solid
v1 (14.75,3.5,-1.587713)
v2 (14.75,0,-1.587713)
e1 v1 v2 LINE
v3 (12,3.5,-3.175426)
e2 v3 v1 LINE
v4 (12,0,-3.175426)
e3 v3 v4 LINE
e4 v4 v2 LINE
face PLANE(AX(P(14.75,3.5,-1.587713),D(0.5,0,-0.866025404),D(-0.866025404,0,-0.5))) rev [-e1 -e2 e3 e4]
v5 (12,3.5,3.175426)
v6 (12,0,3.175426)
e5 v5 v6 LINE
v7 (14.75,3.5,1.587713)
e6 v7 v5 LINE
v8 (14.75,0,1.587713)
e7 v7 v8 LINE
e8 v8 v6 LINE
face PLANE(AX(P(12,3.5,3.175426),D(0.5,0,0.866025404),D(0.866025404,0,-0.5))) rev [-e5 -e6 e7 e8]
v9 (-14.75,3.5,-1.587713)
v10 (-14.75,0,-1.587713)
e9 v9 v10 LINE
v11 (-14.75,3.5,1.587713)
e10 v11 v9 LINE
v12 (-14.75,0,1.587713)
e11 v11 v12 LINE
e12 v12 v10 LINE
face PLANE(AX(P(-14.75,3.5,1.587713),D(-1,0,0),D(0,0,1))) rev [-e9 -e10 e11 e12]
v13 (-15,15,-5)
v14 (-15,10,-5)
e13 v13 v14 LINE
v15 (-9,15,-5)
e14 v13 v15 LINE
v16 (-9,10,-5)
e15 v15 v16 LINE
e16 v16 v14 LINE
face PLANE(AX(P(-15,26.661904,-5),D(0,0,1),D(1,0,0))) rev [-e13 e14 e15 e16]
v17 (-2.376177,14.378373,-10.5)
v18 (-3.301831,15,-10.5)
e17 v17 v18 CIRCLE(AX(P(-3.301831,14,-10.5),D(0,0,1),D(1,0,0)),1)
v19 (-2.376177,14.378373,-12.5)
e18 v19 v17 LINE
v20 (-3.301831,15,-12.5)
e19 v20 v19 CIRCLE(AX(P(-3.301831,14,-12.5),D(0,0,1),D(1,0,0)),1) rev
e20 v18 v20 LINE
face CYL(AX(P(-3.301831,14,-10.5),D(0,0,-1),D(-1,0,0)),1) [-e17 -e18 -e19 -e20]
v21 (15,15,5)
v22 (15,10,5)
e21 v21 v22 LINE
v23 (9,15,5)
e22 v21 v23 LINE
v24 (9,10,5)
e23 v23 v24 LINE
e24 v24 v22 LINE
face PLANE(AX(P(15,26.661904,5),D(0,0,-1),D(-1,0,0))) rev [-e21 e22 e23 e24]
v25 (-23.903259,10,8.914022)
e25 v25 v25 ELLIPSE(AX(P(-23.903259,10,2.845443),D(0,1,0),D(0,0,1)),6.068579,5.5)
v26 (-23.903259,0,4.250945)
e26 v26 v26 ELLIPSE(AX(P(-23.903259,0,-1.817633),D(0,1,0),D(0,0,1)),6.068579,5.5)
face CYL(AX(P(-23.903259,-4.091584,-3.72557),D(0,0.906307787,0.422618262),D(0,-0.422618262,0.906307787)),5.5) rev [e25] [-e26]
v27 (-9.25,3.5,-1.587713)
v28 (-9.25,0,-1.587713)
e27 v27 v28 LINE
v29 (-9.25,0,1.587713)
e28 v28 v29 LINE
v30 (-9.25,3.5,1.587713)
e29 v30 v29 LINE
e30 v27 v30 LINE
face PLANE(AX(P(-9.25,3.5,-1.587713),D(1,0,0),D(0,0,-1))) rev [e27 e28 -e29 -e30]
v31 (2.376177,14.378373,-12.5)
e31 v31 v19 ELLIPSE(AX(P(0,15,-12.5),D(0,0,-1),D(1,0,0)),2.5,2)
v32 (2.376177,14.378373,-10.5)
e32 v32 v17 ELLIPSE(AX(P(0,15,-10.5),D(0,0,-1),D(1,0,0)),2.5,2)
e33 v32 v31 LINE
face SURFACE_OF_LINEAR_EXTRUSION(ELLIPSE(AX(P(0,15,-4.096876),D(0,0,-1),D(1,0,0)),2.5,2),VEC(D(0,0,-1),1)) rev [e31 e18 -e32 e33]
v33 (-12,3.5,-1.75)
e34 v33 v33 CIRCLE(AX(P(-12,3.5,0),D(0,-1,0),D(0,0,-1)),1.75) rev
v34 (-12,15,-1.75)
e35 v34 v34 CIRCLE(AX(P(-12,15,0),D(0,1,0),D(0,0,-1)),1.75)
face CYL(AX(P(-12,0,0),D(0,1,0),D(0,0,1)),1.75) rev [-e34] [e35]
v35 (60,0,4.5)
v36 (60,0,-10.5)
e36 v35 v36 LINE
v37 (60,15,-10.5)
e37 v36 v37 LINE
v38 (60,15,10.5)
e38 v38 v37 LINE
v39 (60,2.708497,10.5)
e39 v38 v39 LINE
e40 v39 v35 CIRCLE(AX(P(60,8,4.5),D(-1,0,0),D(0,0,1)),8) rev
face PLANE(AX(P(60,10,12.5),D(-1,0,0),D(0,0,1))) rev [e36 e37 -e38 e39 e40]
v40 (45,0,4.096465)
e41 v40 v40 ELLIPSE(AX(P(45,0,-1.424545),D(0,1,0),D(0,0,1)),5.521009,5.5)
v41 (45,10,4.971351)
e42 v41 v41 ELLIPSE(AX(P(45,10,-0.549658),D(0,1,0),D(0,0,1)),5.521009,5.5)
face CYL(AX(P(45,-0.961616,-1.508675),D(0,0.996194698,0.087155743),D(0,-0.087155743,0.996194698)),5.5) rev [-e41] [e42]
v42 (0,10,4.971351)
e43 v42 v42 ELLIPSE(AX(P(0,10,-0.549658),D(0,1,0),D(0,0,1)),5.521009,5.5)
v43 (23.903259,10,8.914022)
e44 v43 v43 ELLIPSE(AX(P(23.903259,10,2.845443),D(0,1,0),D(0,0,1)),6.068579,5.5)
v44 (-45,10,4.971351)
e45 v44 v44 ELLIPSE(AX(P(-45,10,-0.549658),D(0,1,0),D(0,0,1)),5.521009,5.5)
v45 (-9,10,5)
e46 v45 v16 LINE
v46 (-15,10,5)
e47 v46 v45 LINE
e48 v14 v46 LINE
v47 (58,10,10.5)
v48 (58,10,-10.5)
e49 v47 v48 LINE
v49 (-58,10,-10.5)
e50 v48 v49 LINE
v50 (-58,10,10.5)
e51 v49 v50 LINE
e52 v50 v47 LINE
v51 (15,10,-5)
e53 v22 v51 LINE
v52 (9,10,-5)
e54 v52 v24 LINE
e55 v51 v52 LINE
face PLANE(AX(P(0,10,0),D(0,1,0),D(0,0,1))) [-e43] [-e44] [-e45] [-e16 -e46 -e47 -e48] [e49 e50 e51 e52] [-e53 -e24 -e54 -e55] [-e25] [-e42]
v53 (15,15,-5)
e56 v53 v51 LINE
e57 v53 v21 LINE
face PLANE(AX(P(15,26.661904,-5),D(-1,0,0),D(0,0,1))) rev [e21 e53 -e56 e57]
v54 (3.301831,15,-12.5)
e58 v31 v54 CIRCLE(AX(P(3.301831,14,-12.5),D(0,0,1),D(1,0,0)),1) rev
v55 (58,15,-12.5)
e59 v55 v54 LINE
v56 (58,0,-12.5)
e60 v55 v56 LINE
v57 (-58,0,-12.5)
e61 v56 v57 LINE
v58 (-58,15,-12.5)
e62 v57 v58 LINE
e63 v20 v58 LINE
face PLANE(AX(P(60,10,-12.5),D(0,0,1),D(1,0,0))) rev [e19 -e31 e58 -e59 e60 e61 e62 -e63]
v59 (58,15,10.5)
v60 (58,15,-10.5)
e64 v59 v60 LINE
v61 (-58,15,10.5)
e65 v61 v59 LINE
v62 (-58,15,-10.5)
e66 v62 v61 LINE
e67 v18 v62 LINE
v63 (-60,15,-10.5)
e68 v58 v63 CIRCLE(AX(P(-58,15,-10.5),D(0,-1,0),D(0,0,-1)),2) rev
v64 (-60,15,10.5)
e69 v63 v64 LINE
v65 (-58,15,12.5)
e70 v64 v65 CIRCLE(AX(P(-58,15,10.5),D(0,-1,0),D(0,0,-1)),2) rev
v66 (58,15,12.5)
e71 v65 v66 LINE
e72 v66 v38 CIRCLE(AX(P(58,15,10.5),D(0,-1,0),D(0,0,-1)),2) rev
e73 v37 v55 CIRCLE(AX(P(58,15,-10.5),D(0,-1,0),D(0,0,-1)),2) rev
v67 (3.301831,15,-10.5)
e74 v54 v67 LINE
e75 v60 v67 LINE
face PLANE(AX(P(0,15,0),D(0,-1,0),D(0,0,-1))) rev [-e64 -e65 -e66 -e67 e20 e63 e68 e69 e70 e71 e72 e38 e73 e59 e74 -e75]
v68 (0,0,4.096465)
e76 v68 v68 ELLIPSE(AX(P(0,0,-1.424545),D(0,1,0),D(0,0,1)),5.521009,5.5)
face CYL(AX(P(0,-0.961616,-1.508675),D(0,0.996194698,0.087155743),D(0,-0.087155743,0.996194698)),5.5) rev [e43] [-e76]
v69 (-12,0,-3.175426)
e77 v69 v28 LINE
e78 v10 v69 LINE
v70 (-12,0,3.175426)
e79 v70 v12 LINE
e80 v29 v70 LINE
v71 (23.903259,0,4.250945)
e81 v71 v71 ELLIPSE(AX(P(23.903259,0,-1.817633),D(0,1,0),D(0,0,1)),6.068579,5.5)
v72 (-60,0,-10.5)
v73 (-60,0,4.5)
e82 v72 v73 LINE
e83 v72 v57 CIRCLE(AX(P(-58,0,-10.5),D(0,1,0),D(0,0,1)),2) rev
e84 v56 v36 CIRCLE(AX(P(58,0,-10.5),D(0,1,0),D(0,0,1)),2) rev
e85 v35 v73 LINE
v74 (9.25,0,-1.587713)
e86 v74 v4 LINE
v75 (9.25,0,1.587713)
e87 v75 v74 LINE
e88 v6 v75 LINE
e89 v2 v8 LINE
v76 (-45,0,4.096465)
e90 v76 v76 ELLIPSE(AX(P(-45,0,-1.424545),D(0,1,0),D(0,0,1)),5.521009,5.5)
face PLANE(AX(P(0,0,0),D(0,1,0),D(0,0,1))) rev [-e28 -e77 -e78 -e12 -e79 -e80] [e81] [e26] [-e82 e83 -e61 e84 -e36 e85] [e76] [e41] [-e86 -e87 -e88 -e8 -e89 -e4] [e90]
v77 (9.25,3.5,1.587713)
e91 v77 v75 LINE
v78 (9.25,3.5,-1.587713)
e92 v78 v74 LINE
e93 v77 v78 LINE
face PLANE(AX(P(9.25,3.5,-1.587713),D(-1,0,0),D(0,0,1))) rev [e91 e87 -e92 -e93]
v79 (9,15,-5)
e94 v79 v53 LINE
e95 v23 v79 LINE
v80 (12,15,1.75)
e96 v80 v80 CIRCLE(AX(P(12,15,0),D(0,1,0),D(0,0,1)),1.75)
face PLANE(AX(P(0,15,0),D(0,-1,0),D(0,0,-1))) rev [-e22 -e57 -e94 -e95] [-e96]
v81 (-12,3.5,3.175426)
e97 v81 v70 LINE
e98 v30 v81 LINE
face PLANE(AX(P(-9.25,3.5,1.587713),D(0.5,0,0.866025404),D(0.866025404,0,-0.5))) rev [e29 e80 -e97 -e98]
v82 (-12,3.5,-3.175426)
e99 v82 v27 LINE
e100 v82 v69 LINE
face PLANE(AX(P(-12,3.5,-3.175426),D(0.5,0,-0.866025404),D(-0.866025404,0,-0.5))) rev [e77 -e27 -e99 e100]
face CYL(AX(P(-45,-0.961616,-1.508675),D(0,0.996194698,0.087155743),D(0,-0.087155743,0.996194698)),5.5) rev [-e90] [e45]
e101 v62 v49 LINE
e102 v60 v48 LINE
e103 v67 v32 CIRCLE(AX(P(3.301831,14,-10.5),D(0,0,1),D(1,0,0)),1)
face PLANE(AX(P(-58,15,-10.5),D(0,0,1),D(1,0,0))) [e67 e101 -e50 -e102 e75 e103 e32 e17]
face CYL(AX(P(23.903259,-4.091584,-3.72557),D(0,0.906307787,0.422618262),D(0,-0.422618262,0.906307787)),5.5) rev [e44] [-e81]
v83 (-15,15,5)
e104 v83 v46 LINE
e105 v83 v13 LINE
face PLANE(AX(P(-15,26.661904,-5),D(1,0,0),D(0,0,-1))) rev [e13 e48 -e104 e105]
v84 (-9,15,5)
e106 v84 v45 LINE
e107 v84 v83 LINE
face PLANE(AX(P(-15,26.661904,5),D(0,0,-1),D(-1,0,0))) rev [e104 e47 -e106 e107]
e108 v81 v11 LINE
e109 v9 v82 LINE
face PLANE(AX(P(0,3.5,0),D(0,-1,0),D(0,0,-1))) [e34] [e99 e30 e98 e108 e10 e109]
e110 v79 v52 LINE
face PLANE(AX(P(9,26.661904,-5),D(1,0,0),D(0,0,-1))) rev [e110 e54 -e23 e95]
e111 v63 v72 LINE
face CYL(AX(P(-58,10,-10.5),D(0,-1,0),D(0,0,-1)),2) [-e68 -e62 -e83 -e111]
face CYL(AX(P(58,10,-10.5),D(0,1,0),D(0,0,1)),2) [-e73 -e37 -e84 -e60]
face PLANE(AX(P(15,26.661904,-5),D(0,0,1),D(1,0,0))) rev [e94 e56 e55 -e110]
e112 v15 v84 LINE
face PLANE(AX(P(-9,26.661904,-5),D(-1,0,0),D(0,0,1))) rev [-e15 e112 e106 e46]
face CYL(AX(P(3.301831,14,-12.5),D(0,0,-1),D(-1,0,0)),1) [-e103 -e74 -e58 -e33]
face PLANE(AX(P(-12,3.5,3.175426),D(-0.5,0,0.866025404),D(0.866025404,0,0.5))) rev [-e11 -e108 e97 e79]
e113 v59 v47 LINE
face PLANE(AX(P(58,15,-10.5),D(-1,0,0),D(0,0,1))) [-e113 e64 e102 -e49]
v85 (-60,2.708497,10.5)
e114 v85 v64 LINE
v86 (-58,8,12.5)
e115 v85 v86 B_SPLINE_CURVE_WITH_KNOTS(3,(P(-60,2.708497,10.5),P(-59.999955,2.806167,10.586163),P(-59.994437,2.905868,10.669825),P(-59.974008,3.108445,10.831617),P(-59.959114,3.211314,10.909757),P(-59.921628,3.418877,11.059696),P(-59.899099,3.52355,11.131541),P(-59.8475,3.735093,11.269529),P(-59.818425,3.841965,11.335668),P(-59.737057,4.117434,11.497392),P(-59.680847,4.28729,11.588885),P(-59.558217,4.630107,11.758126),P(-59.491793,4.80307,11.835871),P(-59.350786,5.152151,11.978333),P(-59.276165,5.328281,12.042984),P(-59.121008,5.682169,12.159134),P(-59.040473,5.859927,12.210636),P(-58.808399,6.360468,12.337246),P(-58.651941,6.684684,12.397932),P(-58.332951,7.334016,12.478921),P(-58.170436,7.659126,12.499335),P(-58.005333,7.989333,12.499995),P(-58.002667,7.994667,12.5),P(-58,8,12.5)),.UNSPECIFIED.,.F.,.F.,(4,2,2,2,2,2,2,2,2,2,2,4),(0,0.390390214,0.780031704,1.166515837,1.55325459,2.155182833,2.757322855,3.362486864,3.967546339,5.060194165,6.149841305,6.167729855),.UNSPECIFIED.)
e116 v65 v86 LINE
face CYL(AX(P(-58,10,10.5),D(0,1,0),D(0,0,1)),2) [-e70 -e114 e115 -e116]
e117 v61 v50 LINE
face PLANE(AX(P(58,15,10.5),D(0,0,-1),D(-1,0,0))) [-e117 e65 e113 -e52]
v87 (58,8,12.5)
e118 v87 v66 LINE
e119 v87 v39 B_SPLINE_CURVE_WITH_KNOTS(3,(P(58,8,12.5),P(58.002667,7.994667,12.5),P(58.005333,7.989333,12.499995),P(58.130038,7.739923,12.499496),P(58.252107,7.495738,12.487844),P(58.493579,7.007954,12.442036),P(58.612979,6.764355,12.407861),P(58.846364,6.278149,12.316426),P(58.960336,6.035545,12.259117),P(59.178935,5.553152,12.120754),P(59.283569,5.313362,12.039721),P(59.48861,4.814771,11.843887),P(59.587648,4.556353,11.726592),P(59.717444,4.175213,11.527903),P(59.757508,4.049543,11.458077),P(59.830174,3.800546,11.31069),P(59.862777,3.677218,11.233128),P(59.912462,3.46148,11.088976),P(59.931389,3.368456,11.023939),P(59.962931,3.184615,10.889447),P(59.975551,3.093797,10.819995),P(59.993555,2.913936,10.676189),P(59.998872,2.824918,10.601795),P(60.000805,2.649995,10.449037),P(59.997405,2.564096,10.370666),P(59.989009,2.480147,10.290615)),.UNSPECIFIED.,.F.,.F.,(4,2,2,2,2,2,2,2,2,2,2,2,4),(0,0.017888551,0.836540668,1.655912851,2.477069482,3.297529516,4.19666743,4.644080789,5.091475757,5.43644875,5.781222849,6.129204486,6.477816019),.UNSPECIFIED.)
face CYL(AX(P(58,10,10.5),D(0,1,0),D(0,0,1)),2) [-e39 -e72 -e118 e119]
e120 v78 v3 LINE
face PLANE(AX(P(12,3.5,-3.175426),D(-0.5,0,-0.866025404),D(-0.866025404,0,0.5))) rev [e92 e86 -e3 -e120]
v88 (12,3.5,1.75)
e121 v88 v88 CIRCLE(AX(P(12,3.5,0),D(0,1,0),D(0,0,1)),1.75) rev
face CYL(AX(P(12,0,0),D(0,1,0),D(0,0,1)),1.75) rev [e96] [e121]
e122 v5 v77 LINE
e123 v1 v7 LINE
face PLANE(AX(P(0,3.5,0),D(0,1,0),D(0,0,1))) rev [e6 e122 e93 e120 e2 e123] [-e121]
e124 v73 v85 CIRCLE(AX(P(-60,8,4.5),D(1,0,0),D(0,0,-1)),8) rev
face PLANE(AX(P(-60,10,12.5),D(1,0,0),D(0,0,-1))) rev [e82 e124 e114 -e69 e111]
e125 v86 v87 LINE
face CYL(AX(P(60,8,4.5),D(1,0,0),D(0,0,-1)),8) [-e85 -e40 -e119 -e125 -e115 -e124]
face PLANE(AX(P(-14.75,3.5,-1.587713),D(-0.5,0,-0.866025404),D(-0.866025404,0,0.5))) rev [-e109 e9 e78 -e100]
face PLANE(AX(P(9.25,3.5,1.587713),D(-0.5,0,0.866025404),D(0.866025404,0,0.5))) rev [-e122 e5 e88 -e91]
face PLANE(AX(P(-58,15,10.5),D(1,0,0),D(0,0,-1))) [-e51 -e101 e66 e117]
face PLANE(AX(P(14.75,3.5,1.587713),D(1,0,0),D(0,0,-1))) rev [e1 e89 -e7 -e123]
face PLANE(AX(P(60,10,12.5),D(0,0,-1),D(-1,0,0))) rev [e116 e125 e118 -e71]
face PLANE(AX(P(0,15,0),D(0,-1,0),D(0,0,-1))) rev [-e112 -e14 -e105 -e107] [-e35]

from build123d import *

# Parameters (mm, degrees)
BASE_W                 = 120
BASE_H                 = 25
BASE_EXT_DEPTH         = 10
SKETCH3_R              = 5.5
LED_BOTTOM_CUT_DEPTH   = 63.469697574
LED_FOR_TOP_ROW_R      = 5.5
LED_TOP_CUT_DEPTH      = 65.13752525
SKETCH5_W              = 120
SKETCH5_H              = 25
SKETCH5_W_2            = 116
SKETCH5_H_2            = 21
WIRE_BOX_RIM_DEPTH     = 5
SKETCH6_W              = 6
SKETCH6_H              = 10
SUPPORT_SPACERS_DEPTH  = 5
SKETCH8_R              = 1.75
M3_SCREW_CUT_DEPTH     = 64.097147321
M3_NUT_CUT_DEPTH       = 3.5
WIRE_CUT_OUT_RX        = 2.5
WIRE_CUT_OUT_RY        = 2
WIRE_CUT_OUT_CUT_DEPTH = 2
FILLET1_R              = 1
FILLET2_R              = 1
FILLET3_R              = 2
FILLET4_R              = 2
FILLET5_R              = 2
FILLET6_R              = 2
FILLET7_R              = 8


with BuildPart() as part:
    # Base → Base EXT (new body)
    with BuildSketch(Plane(origin=(0, 0, 0), x_dir=(1, 0, 0), z_dir=(0, 1, 0))):
        Rectangle(BASE_W, BASE_H)
    extrude(amount=BASE_EXT_DEPTH)

    # Sketch3 → LED bottom CUT (cut, through all)
    with BuildSketch(Plane(origin=(0, 11.009339875, 0.963192432), x_dir=(1, 0, 0), z_dir=(0, 0.9961946980917455, 0.08715574274765836))):
        with Locations(Location((-45, 1.419123701, 0), (0, 0, 270))):
            Circle(SKETCH3_R)
        with Locations(Location((0, 1.419123701, 0), (0, 0, 270))):
            Circle(SKETCH3_R)
        with Locations(Location((45, 1.419123701, 0), (0, 0, 270))):
            Circle(SKETCH3_R)
    extrude(amount=-LED_BOTTOM_CUT_DEPTH, mode=Mode.SUBTRACT)

    # LED for Top Row → LED top CUT (cut, through all)
    with BuildSketch(Plane(origin=(0, 13.001715818, 6.062799655), x_dir=(1, 0, 0), z_dir=(0, 0.9063077870366496, 0.4226182617407003))):
        with Locations(Location((-23.903258736, 1.647335279, 0), (0, 0, 270))):
            Circle(LED_FOR_TOP_ROW_R)
        with Locations(Location((23.903258736, 1.647335279, 0), (0, 0, 270))):
            Circle(LED_FOR_TOP_ROW_R)
    extrude(amount=-LED_TOP_CUT_DEPTH, mode=Mode.SUBTRACT)

    # Sketch5 → Wire Box Rim (add)
    with BuildSketch(Plane(origin=(0, 10, 0), x_dir=(1, 0, 0), z_dir=(0, 1, 0))):
        Rectangle(SKETCH5_W, SKETCH5_H)
        Rectangle(SKETCH5_W_2, SKETCH5_H_2, mode=Mode.SUBTRACT)
    extrude(amount=WIRE_BOX_RIM_DEPTH)

    # Sketch6 → Support Spacers (add)
    with BuildSketch(Plane(origin=(0, 10, 0), x_dir=(1, 0, 0), z_dir=(0, 1, 0))):
        with Locations((-12, 0)):
            Rectangle(SKETCH6_W, SKETCH6_H)
        with Locations((12, 0)):
            Rectangle(SKETCH6_W, SKETCH6_H)
    extrude(amount=SUPPORT_SPACERS_DEPTH)

    # Sketch8 → M3 Screw CUT (cut, through all)
    with BuildSketch(Plane(origin=(0, 15, 0), x_dir=(1, 0, 0), z_dir=(0, 1, 0))):
        with Locations(Location((12, 0, 0), (0, 0, 270))):
            Circle(SKETCH8_R)
        with Locations(Location((-12, 0, 0), (0, 0, 90))):
            Circle(SKETCH8_R)
    extrude(amount=-M3_SCREW_CUT_DEPTH, mode=Mode.SUBTRACT)

    # M3 Nut → M3 Nut CUT (cut)
    with BuildSketch(Plane.XZ):
        Polygon((-12, 3.175426481), (-14.75, 1.58771324), (-14.75, -1.58771324), (-12, -3.175426481), (-9.25, -1.58771324), (-9.25, 1.58771324), align=None)
        Polygon((9.25, 1.58771324), (12, 3.175426481), (14.75, 1.58771324), (14.75, -1.58771324), (12, -3.175426481), (9.25, -1.58771324), align=None)
    extrude(amount=-M3_NUT_CUT_DEPTH, mode=Mode.SUBTRACT)

    # Wire cut out → Wire cut out CUT (cut)
    with BuildSketch(Plane(origin=(0, 0, -12.5), x_dir=(-1, 0, 0), z_dir=(0, 0, -1))):
        with Locations(Location((0, 15), (0, 0, 180))):
            Ellipse(WIRE_CUT_OUT_RX, WIRE_CUT_OUT_RY)
    extrude(amount=-WIRE_CUT_OUT_CUT_DEPTH, mode=Mode.SUBTRACT)

    # Fillet1
    fillet1_edges = [part.edges().sort_by_distance(p)[0] for p in [
        (2.5, 15, -11.5),
    ]]
    fillet(fillet1_edges, radius=FILLET1_R)

    # Fillet2
    fillet2_edges = [part.edges().sort_by_distance(p)[0] for p in [
        (-2.5, 15, -11.5),
    ]]
    fillet(fillet2_edges, radius=FILLET2_R)

    # Fillet3
    fillet3_edges = [part.edges().sort_by_distance(p)[0] for p in [
        (-60, 7.5, -12.5),
    ]]
    fillet(fillet3_edges, radius=FILLET3_R)

    # Fillet4
    fillet4_edges = [part.edges().sort_by_distance(p)[0] for p in [
        (60, 7.5, -12.5),
    ]]
    fillet(fillet4_edges, radius=FILLET4_R)

    # Fillet5
    fillet5_edges = [part.edges().sort_by_distance(p)[0] for p in [
        (60, 7.5, 12.5),
    ]]
    fillet(fillet5_edges, radius=FILLET5_R)

    # Fillet6
    fillet6_edges = [part.edges().sort_by_distance(p)[0] for p in [
        (-60, 7.5, 12.5),
    ]]
    fillet(fillet6_edges, radius=FILLET6_R)

    # Fillet7
    # the kernel refuses this fillet: 8 mm, written as the material it takes off along each edge
    with BuildSketch(Plane(origin=(78, 0, 12.5), x_dir=(0, 1, 0), z_dir=(-1, 0, 0))) as fillet7_piece_1:
        with BuildLine():
            CenterArc((FILLET7_R, FILLET7_R), FILLET7_R, 180, 90)
            Line((0, FILLET7_R), (0, 0))
            Line((0, 0), (FILLET7_R, 0))
        make_face()
    extrude(amount=156, mode=Mode.SUBTRACT)


solid = part.part
